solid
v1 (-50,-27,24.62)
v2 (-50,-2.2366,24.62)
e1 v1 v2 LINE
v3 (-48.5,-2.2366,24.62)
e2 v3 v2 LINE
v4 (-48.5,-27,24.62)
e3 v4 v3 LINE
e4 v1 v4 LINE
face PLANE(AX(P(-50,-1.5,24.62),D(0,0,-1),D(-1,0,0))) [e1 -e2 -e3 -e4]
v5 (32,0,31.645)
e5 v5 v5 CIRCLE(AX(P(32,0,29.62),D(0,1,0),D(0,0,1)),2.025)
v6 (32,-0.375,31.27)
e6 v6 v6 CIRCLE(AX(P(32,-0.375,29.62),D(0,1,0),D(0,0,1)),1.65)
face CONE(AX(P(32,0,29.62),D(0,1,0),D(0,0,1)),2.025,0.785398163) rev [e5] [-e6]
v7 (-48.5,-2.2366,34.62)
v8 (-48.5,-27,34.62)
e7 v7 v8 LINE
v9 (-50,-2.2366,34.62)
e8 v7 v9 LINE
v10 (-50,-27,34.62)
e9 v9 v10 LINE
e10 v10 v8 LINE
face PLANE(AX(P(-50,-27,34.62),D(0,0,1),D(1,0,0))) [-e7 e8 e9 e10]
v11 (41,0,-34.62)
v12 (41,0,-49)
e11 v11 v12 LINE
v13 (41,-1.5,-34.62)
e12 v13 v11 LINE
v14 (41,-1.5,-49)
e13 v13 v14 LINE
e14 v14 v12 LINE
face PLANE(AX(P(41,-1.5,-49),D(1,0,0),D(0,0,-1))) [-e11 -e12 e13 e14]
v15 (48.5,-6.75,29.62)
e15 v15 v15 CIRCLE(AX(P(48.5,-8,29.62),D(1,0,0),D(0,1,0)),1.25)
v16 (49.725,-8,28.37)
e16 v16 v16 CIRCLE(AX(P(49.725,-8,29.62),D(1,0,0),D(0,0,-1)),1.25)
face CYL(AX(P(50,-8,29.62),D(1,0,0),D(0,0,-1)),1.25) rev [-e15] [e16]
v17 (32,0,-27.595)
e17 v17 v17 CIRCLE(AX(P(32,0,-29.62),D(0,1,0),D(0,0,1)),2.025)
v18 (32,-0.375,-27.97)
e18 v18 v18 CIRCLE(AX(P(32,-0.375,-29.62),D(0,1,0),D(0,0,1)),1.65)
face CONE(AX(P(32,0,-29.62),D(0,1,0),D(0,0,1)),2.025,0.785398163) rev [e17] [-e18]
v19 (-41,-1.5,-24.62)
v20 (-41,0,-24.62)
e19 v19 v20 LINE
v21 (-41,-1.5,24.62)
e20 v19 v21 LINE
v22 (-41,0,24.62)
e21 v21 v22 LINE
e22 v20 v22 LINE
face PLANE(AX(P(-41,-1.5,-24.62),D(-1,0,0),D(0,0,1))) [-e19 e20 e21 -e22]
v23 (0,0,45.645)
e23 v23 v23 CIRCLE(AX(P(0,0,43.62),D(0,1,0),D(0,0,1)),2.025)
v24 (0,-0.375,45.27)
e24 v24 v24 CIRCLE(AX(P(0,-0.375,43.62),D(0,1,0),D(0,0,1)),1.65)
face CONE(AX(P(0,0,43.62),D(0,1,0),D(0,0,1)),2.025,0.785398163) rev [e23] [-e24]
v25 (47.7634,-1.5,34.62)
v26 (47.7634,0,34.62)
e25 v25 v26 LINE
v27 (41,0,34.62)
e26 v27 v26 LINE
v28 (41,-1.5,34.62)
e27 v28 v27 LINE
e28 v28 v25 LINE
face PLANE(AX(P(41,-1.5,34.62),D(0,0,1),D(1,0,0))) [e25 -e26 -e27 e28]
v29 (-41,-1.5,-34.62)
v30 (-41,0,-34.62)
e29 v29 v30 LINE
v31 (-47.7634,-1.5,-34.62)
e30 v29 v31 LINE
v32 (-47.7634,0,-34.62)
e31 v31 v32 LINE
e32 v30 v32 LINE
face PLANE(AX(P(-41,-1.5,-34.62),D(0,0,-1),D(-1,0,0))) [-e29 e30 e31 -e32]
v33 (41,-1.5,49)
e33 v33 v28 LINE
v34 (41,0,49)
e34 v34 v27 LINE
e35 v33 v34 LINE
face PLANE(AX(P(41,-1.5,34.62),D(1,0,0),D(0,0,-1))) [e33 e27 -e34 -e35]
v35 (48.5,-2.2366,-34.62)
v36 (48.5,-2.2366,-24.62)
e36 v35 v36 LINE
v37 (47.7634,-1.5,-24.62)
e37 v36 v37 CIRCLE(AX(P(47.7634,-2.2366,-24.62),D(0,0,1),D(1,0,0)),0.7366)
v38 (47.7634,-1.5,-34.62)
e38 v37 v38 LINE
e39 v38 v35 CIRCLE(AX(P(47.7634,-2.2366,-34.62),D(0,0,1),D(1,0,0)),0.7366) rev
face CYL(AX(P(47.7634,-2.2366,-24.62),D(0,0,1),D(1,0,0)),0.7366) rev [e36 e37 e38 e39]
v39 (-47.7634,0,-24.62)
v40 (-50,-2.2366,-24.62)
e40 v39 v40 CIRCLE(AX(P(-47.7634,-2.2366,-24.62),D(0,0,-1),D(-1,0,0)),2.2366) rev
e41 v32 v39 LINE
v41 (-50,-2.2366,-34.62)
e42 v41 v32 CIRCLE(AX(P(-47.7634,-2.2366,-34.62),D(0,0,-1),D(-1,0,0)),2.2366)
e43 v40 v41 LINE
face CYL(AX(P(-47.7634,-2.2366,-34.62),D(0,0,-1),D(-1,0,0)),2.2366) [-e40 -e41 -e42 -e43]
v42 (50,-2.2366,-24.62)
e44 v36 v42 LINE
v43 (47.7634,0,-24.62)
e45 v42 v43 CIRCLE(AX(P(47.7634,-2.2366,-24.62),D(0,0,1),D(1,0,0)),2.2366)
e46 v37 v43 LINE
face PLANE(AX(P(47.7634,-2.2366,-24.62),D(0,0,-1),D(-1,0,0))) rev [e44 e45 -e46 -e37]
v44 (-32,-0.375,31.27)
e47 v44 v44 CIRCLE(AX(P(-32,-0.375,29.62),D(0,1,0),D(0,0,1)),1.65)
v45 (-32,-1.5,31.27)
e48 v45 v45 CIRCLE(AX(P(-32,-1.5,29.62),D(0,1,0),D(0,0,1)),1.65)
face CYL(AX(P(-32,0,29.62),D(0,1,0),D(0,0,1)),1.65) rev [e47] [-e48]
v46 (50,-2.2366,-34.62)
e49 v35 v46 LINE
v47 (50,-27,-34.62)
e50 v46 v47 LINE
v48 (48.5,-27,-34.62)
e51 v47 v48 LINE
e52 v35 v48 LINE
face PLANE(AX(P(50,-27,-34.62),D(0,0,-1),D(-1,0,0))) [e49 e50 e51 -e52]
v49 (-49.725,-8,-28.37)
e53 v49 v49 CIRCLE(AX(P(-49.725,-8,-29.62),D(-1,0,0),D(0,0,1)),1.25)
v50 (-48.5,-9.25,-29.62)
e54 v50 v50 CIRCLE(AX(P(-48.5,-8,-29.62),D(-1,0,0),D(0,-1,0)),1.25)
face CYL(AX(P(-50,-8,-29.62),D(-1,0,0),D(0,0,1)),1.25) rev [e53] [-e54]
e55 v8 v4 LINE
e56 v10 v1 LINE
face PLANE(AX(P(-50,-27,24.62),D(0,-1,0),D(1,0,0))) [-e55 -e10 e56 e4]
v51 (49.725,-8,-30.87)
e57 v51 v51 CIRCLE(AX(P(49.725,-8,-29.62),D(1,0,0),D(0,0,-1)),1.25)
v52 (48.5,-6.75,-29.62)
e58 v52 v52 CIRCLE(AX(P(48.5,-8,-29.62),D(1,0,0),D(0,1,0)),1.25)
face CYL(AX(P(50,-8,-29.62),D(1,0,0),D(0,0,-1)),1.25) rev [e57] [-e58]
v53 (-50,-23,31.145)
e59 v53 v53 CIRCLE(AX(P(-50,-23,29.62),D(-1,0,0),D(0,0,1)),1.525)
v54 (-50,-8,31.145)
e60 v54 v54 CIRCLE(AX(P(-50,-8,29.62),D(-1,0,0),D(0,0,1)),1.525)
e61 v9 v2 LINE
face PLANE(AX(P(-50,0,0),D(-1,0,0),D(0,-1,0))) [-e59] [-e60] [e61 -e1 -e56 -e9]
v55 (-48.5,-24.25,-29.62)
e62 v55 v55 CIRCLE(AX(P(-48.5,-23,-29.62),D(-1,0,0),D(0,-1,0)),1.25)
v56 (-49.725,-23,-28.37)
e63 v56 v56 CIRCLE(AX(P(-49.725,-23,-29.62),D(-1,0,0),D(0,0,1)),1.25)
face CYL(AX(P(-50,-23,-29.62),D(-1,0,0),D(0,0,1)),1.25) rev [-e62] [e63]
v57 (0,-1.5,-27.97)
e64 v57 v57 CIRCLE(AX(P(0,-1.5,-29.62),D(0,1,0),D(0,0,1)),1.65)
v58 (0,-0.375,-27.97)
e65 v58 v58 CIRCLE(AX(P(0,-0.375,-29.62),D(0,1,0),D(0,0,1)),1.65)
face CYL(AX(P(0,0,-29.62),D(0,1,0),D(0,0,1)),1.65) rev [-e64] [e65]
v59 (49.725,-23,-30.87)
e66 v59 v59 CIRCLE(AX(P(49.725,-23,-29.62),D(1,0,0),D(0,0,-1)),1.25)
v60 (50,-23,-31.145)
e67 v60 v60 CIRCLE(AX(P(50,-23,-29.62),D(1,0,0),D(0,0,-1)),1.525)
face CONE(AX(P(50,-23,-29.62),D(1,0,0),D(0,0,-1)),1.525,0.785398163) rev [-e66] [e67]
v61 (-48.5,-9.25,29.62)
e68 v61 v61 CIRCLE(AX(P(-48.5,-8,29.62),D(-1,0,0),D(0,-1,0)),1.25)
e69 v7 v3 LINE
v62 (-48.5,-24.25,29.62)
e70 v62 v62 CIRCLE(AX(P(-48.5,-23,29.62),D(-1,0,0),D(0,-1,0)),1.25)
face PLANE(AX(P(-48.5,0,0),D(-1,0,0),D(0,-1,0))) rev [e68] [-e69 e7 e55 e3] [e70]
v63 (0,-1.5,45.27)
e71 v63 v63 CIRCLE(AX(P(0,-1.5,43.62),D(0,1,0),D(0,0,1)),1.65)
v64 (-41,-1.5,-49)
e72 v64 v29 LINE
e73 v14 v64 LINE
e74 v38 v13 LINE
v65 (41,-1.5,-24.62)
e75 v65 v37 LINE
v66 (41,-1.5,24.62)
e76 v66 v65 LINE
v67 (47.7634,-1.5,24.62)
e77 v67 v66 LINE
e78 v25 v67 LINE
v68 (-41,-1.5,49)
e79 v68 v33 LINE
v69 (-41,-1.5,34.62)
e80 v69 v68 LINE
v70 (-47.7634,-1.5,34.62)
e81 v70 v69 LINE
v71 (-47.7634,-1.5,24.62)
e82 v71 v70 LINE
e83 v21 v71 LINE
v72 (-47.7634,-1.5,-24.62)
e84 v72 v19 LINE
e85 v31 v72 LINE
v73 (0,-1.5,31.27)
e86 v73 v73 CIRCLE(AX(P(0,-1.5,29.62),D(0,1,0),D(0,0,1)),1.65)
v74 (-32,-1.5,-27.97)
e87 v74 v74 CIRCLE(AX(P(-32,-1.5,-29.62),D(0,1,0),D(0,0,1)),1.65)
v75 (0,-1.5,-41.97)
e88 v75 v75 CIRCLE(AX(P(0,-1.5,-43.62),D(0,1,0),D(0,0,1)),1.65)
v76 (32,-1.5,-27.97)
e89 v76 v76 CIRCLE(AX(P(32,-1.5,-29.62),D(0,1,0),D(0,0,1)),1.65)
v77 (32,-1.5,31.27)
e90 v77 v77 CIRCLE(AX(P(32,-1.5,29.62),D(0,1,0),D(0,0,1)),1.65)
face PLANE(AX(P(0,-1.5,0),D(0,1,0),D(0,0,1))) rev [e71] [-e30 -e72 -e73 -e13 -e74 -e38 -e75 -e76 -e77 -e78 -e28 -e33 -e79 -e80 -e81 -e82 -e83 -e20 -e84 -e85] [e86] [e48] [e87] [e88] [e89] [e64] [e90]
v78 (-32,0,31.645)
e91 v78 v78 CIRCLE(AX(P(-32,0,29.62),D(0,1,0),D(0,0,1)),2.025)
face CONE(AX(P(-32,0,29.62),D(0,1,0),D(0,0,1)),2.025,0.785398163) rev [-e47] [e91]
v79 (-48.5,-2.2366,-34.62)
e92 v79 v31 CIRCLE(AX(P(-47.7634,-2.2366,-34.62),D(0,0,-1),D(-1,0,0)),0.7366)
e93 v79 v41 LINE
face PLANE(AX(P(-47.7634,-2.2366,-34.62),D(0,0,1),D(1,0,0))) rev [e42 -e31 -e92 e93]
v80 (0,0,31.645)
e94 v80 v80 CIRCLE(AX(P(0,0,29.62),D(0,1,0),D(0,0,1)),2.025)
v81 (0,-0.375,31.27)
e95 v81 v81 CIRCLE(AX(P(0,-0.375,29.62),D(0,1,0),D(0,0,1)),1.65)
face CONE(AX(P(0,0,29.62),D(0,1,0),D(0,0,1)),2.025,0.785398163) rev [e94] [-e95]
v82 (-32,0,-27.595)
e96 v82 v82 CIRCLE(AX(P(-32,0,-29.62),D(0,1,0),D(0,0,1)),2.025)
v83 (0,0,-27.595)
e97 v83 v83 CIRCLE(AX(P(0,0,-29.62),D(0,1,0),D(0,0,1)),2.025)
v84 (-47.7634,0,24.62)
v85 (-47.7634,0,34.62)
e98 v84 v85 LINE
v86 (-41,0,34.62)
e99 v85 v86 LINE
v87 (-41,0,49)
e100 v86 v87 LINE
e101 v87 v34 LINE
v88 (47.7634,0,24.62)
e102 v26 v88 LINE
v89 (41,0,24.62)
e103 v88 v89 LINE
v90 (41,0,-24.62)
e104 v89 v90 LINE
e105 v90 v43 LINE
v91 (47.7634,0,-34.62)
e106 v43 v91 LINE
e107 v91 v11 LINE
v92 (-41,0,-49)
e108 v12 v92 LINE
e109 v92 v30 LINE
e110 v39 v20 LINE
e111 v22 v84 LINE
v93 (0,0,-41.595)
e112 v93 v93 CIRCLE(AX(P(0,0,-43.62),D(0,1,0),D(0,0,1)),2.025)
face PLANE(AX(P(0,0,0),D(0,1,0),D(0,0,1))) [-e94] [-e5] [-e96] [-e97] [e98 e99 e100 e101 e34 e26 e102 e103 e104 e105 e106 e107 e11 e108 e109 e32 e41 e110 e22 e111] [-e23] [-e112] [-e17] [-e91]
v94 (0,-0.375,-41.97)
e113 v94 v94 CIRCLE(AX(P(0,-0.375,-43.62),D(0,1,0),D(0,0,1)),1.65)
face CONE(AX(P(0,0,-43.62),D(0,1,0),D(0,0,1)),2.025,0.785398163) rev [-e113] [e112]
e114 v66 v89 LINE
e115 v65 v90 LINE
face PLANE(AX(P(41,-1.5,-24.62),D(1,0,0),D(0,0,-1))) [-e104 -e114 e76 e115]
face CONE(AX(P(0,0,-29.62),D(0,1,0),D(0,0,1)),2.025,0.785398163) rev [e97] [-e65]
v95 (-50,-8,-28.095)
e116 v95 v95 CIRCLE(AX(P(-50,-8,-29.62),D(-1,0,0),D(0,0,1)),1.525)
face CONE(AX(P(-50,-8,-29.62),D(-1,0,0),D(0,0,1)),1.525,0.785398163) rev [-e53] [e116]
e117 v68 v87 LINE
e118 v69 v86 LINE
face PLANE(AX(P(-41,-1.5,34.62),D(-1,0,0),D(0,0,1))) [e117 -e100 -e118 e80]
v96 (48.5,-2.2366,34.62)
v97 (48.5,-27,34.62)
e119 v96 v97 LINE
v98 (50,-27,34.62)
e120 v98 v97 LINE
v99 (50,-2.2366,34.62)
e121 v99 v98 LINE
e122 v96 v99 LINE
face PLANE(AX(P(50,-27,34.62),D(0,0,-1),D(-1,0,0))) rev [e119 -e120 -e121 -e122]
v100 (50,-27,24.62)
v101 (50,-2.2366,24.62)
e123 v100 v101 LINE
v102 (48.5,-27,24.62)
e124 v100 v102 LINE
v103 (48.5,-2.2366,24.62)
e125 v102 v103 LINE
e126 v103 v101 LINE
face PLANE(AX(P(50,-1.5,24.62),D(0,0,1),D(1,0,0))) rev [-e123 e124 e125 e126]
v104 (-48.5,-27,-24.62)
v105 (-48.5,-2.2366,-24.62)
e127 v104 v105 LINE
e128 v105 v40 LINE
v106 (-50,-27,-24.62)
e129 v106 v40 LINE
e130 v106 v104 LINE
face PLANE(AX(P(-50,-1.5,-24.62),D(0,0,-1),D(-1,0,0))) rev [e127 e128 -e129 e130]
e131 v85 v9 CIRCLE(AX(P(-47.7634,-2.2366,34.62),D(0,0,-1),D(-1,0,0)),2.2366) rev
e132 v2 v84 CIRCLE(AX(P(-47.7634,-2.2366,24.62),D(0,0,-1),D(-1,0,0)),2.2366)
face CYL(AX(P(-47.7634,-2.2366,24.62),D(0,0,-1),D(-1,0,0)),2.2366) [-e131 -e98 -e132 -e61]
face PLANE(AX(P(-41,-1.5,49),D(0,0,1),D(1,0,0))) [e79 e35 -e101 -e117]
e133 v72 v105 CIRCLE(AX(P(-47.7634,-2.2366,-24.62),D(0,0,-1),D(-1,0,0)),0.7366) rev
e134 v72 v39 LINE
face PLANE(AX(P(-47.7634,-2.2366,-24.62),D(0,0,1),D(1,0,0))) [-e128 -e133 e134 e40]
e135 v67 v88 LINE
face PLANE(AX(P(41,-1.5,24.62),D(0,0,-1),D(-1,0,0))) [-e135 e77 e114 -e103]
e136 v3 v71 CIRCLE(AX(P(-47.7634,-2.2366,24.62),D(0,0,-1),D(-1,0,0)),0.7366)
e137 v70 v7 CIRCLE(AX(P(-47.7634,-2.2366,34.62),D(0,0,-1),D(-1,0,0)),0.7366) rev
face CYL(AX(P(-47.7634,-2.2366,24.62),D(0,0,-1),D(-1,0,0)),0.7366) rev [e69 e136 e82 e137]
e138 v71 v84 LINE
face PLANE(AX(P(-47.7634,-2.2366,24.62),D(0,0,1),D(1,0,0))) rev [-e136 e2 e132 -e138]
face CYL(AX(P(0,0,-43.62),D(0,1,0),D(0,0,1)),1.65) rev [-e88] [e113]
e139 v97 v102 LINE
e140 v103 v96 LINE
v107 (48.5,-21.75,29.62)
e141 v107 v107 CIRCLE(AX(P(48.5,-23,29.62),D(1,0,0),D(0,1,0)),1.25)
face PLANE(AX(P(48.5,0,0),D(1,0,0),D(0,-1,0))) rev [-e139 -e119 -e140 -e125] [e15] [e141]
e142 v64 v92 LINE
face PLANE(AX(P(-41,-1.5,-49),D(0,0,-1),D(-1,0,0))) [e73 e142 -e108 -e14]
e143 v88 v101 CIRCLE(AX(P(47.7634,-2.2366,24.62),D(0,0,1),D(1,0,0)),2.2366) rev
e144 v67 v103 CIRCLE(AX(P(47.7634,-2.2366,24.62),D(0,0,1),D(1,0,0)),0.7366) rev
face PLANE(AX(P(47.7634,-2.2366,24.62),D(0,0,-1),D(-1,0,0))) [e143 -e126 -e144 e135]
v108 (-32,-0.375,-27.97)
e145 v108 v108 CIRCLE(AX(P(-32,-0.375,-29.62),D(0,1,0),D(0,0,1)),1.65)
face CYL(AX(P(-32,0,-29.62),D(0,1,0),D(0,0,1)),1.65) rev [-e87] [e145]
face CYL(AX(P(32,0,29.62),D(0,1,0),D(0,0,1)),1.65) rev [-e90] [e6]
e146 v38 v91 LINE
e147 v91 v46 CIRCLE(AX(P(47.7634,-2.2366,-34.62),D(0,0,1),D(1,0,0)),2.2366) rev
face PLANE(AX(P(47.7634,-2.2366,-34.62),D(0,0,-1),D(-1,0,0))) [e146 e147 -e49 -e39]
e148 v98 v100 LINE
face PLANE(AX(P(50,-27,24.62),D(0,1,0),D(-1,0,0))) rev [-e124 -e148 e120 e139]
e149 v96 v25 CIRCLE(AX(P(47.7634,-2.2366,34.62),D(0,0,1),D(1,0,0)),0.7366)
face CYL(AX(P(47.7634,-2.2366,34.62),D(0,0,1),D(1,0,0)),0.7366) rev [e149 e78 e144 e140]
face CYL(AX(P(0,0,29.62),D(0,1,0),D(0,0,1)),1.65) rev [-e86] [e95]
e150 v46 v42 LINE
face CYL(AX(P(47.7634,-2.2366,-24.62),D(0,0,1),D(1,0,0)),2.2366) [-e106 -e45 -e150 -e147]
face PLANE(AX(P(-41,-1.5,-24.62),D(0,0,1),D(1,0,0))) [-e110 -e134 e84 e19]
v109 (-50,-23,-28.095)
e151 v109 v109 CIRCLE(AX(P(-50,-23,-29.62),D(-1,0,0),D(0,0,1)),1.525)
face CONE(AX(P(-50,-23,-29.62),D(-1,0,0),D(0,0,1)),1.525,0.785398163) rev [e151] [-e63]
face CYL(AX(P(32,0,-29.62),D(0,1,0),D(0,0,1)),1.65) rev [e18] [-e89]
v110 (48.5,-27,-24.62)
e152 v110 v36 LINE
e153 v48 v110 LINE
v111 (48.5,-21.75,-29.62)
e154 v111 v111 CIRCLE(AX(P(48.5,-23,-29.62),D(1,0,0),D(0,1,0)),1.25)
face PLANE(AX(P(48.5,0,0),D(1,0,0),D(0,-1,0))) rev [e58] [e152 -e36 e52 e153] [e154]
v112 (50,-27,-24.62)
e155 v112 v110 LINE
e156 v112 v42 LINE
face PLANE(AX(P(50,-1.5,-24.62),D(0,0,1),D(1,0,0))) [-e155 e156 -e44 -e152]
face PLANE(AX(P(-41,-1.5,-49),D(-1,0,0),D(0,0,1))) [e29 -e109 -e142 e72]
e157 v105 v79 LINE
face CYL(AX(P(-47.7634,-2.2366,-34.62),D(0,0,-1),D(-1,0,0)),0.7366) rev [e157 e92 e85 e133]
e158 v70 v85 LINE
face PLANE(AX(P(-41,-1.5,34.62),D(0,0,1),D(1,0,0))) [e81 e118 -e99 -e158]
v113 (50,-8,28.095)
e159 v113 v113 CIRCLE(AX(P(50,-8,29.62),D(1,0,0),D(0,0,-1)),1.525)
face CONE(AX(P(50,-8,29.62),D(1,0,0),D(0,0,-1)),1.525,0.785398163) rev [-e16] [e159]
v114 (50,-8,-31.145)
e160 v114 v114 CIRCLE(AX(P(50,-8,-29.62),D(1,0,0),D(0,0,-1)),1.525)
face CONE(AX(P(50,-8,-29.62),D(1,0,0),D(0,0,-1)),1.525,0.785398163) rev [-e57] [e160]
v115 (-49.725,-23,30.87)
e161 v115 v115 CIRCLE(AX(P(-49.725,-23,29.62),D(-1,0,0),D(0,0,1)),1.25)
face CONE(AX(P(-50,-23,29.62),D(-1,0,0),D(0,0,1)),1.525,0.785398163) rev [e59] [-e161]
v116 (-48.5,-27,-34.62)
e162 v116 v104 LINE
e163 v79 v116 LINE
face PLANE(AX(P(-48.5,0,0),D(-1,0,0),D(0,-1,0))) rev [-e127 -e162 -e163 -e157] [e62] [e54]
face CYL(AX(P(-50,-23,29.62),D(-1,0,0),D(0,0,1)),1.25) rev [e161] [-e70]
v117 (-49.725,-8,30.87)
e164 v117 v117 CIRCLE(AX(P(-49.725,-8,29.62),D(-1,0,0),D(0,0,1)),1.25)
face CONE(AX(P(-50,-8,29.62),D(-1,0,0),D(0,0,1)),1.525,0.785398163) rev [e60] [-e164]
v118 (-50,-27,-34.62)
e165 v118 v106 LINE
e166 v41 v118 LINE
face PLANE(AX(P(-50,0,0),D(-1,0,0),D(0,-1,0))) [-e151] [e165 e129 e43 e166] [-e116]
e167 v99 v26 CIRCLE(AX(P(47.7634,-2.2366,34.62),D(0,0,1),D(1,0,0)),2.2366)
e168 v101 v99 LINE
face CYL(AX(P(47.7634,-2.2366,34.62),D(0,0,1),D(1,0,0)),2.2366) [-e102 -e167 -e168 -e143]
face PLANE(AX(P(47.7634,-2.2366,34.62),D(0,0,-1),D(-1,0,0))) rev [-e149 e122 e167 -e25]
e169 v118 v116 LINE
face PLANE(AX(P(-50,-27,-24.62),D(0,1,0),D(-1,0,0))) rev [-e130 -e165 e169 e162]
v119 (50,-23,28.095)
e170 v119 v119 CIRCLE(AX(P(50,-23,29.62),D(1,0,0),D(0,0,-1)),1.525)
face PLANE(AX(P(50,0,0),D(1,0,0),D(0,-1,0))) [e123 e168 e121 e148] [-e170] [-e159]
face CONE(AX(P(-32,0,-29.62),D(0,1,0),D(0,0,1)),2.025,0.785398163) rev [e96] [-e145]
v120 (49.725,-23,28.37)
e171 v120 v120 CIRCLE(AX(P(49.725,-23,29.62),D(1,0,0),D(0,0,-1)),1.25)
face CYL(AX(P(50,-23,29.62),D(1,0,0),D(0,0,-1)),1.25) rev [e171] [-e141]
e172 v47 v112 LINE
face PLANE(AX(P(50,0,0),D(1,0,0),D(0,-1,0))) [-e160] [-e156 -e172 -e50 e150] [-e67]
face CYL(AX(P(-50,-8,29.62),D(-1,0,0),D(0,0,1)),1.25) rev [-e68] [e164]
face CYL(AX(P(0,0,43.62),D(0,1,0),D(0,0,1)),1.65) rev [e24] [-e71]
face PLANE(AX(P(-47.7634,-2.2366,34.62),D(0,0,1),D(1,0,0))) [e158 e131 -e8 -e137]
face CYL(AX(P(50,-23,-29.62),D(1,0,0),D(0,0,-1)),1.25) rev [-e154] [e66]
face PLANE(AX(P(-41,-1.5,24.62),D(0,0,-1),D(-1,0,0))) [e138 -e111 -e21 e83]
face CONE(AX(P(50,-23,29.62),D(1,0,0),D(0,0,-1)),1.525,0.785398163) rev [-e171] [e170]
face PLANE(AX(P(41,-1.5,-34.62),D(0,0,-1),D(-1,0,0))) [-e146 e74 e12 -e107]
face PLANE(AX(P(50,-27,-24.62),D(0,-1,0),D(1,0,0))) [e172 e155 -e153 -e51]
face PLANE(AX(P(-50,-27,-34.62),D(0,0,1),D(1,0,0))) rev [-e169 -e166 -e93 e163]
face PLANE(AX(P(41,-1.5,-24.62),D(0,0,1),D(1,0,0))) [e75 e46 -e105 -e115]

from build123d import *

# Parameters (mm, degrees)
BASE_FLANGE1_DEPTH           = 1.5
EDGE_FLANGE1_STRIP_W         = 7.4732
EDGE_FLANGE1_STRIP_H         = 1.5
EDGE_FLANGE1_STRIP_CUT_DEPTH = 10
EDGE_FLANGE1_DEPTH           = 10
M3_TAPPED_HOLE1_D            = 2.5
M3_TAPPED_HOLE1_CSINK_D      = 3.05
M3_TAPPED_HOLE1_CSINK_ANGLE  = 90
MIRROR2_COPY_1_SKETCH_W      = 7.4732
MIRROR2_COPY_1_SKETCH_H      = 1.5
MIRROR2_COPY_1_DEPTH         = 10
MIRROR2_COPY_2_DEPTH         = 10
MIRROR2_COPY_3_D             = 2.5
MIRROR2_COPY_3_CSINK_D       = 3.05
MIRROR2_COPY_3_CSINK_ANGLE   = 90
M4_TAPPED_HOLE1_D            = 3.3
M4_TAPPED_HOLE1_CSINK_D      = 4.05
M4_TAPPED_HOLE1_CSINK_ANGLE  = 90


# Sheet-metal steps are written as plain solids
with BuildPart() as part:
    # Sketch1 → Base-Flange1 (new body)
    with BuildSketch(Plane(origin=(0, 0, 0), x_dir=(1, 0, 0), z_dir=(0, 1, 0))):
        Polygon((-41, -34.62), (-41, -49), (41, -49), (41, -34.62), (50, -34.62), (50, -24.62), (41, -24.62), (41, 24.62), (50, 24.62), (50, 34.62), (41, 34.62), (41, 49), (-41, 49), (-41, 34.62), (-50, 34.62), (-50, 24.62), (-41, 24.62), (-41, -24.62), (-50, -24.62), (-50, -34.62), align=None)
    extrude(amount=-BASE_FLANGE1_DEPTH)

    # Edge-Flange1 strip (across the edge) → Edge-Flange1 strip cut (cut)
    with BuildSketch(Plane(origin=(-50, -1.5, 34.62), x_dir=(1, 0, 0), z_dir=(0, 0, -1))):
        with Locations((-1.5, -0.75)):
            Rectangle(EDGE_FLANGE1_STRIP_W, EDGE_FLANGE1_STRIP_H)
    edge_flange1_strip_cut = extrude(amount=EDGE_FLANGE1_STRIP_CUT_DEPTH, mode=Mode.SUBTRACT)

    # Edge-Flange1 section (across the edge) → Edge-Flange1 (add)
    with BuildSketch(Plane(origin=(-50, -1.5, 34.62), x_dir=(1, 0, 0), z_dir=(0, 0, -1))):
        with BuildLine():
            Line((0, 0.7366), (0, 25.5))
            Line((0, 25.5), (1.5, 25.5))
            Line((1.5, 25.5), (1.5, 0.7366))
            ThreePointArc((1.5, 0.7366), (1.715745145, 0.215745145), (2.2366, 0))
            Line((2.2366, 0), (2.2366, -1.5))
            ThreePointArc((2.2366, -1.5), (0.655084973, -0.844915027), (0, 0.7366))
        make_face()
    edge_flange1 = extrude(amount=EDGE_FLANGE1_DEPTH)

    # M3 Tapped Hole1 (through all)
    with Locations(Plane.ZY.offset(50)):
        with Locations((29.62, -8), (29.62, -23)):
            m3_tapped_hole1 = CounterSinkHole(M3_TAPPED_HOLE1_D / 2, M3_TAPPED_HOLE1_CSINK_D / 2, counter_sink_angle=M3_TAPPED_HOLE1_CSINK_ANGLE)

    # Mirror1: Edge-Flange1 strip cut, Edge-Flange1, M3 Tapped Hole1 across plane
    add(edge_flange1_strip_cut.mirror(Plane(origin=(0, 0, 0), x_dir=(0, 0, 1), z_dir=(1, 0, 0))), mode=Mode.SUBTRACT)
    add(edge_flange1.mirror(Plane(origin=(0, 0, 0), x_dir=(0, 0, 1), z_dir=(1, 0, 0))))
    add(m3_tapped_hole1.mirror(Plane(origin=(0, 0, 0), x_dir=(0, 0, 1), z_dir=(1, 0, 0))), mode=Mode.SUBTRACT)

    # Mirror2: Edge-Flange1 strip cut, Edge-Flange1, M3 Tapped Hole1 across plane
    add(edge_flange1_strip_cut.mirror(Plane.XY), mode=Mode.SUBTRACT)
    add(edge_flange1.mirror(Plane.XY))
    add(m3_tapped_hole1.mirror(Plane.XY), mode=Mode.SUBTRACT)

    # Mirror2 copy 1 sketch → Mirror2 copy 1 (cut)
    with BuildSketch(Plane(origin=(50, -1.5, -34.62), x_dir=(-1, 0, 0), z_dir=(0, 0, 1))):
        with Locations((-1.5, -0.75)):
            Rectangle(MIRROR2_COPY_1_SKETCH_W, MIRROR2_COPY_1_SKETCH_H)
    extrude(amount=MIRROR2_COPY_1_DEPTH, mode=Mode.SUBTRACT)

    # Mirror2 copy 2 sketch → Mirror2 copy 2 (add)
    with BuildSketch(Plane(origin=(50, -1.5, -34.62), x_dir=(-1, 0, 0), z_dir=(0, 0, 1))):
        with BuildLine():
            Line((0, 0.7366), (0, 25.5))
            Line((0, 25.5), (1.5, 25.5))
            Line((1.5, 25.5), (1.5, 0.7366))
            ThreePointArc((1.5, 0.7366), (1.715745145, 0.215745145), (2.2366, 0))
            Line((2.2366, 0), (2.2366, -1.5))
            ThreePointArc((2.2366, -1.5), (0.655084973, -0.844915027), (0, 0.7366))
        make_face()
    extrude(amount=MIRROR2_COPY_2_DEPTH)

    # Mirror2 copy 3 (through all)
    with Locations(Plane(origin=(50, 0, 0), x_dir=(0, 0, -1), z_dir=(1, 0, 0))):
        with Locations((29.62, -8), (29.62, -23)):
            CounterSinkHole(MIRROR2_COPY_3_D / 2, MIRROR2_COPY_3_CSINK_D / 2, counter_sink_angle=MIRROR2_COPY_3_CSINK_ANGLE)

    # M4 Tapped Hole1 (through all)
    with Locations(Plane(origin=(0, 0, 0), x_dir=(1, 0, 0), z_dir=(0, 1, 0))):
        with Locations((-32, 29.62), (0, 29.62), (32, 29.62), (-32, -29.62), (0, -29.62), (32, -29.62), (0, 43.62), (0, -43.62)):
            CounterSinkHole(M4_TAPPED_HOLE1_D / 2, M4_TAPPED_HOLE1_CSINK_D / 2, counter_sink_angle=M4_TAPPED_HOLE1_CSINK_ANGLE)


solid = part.part
